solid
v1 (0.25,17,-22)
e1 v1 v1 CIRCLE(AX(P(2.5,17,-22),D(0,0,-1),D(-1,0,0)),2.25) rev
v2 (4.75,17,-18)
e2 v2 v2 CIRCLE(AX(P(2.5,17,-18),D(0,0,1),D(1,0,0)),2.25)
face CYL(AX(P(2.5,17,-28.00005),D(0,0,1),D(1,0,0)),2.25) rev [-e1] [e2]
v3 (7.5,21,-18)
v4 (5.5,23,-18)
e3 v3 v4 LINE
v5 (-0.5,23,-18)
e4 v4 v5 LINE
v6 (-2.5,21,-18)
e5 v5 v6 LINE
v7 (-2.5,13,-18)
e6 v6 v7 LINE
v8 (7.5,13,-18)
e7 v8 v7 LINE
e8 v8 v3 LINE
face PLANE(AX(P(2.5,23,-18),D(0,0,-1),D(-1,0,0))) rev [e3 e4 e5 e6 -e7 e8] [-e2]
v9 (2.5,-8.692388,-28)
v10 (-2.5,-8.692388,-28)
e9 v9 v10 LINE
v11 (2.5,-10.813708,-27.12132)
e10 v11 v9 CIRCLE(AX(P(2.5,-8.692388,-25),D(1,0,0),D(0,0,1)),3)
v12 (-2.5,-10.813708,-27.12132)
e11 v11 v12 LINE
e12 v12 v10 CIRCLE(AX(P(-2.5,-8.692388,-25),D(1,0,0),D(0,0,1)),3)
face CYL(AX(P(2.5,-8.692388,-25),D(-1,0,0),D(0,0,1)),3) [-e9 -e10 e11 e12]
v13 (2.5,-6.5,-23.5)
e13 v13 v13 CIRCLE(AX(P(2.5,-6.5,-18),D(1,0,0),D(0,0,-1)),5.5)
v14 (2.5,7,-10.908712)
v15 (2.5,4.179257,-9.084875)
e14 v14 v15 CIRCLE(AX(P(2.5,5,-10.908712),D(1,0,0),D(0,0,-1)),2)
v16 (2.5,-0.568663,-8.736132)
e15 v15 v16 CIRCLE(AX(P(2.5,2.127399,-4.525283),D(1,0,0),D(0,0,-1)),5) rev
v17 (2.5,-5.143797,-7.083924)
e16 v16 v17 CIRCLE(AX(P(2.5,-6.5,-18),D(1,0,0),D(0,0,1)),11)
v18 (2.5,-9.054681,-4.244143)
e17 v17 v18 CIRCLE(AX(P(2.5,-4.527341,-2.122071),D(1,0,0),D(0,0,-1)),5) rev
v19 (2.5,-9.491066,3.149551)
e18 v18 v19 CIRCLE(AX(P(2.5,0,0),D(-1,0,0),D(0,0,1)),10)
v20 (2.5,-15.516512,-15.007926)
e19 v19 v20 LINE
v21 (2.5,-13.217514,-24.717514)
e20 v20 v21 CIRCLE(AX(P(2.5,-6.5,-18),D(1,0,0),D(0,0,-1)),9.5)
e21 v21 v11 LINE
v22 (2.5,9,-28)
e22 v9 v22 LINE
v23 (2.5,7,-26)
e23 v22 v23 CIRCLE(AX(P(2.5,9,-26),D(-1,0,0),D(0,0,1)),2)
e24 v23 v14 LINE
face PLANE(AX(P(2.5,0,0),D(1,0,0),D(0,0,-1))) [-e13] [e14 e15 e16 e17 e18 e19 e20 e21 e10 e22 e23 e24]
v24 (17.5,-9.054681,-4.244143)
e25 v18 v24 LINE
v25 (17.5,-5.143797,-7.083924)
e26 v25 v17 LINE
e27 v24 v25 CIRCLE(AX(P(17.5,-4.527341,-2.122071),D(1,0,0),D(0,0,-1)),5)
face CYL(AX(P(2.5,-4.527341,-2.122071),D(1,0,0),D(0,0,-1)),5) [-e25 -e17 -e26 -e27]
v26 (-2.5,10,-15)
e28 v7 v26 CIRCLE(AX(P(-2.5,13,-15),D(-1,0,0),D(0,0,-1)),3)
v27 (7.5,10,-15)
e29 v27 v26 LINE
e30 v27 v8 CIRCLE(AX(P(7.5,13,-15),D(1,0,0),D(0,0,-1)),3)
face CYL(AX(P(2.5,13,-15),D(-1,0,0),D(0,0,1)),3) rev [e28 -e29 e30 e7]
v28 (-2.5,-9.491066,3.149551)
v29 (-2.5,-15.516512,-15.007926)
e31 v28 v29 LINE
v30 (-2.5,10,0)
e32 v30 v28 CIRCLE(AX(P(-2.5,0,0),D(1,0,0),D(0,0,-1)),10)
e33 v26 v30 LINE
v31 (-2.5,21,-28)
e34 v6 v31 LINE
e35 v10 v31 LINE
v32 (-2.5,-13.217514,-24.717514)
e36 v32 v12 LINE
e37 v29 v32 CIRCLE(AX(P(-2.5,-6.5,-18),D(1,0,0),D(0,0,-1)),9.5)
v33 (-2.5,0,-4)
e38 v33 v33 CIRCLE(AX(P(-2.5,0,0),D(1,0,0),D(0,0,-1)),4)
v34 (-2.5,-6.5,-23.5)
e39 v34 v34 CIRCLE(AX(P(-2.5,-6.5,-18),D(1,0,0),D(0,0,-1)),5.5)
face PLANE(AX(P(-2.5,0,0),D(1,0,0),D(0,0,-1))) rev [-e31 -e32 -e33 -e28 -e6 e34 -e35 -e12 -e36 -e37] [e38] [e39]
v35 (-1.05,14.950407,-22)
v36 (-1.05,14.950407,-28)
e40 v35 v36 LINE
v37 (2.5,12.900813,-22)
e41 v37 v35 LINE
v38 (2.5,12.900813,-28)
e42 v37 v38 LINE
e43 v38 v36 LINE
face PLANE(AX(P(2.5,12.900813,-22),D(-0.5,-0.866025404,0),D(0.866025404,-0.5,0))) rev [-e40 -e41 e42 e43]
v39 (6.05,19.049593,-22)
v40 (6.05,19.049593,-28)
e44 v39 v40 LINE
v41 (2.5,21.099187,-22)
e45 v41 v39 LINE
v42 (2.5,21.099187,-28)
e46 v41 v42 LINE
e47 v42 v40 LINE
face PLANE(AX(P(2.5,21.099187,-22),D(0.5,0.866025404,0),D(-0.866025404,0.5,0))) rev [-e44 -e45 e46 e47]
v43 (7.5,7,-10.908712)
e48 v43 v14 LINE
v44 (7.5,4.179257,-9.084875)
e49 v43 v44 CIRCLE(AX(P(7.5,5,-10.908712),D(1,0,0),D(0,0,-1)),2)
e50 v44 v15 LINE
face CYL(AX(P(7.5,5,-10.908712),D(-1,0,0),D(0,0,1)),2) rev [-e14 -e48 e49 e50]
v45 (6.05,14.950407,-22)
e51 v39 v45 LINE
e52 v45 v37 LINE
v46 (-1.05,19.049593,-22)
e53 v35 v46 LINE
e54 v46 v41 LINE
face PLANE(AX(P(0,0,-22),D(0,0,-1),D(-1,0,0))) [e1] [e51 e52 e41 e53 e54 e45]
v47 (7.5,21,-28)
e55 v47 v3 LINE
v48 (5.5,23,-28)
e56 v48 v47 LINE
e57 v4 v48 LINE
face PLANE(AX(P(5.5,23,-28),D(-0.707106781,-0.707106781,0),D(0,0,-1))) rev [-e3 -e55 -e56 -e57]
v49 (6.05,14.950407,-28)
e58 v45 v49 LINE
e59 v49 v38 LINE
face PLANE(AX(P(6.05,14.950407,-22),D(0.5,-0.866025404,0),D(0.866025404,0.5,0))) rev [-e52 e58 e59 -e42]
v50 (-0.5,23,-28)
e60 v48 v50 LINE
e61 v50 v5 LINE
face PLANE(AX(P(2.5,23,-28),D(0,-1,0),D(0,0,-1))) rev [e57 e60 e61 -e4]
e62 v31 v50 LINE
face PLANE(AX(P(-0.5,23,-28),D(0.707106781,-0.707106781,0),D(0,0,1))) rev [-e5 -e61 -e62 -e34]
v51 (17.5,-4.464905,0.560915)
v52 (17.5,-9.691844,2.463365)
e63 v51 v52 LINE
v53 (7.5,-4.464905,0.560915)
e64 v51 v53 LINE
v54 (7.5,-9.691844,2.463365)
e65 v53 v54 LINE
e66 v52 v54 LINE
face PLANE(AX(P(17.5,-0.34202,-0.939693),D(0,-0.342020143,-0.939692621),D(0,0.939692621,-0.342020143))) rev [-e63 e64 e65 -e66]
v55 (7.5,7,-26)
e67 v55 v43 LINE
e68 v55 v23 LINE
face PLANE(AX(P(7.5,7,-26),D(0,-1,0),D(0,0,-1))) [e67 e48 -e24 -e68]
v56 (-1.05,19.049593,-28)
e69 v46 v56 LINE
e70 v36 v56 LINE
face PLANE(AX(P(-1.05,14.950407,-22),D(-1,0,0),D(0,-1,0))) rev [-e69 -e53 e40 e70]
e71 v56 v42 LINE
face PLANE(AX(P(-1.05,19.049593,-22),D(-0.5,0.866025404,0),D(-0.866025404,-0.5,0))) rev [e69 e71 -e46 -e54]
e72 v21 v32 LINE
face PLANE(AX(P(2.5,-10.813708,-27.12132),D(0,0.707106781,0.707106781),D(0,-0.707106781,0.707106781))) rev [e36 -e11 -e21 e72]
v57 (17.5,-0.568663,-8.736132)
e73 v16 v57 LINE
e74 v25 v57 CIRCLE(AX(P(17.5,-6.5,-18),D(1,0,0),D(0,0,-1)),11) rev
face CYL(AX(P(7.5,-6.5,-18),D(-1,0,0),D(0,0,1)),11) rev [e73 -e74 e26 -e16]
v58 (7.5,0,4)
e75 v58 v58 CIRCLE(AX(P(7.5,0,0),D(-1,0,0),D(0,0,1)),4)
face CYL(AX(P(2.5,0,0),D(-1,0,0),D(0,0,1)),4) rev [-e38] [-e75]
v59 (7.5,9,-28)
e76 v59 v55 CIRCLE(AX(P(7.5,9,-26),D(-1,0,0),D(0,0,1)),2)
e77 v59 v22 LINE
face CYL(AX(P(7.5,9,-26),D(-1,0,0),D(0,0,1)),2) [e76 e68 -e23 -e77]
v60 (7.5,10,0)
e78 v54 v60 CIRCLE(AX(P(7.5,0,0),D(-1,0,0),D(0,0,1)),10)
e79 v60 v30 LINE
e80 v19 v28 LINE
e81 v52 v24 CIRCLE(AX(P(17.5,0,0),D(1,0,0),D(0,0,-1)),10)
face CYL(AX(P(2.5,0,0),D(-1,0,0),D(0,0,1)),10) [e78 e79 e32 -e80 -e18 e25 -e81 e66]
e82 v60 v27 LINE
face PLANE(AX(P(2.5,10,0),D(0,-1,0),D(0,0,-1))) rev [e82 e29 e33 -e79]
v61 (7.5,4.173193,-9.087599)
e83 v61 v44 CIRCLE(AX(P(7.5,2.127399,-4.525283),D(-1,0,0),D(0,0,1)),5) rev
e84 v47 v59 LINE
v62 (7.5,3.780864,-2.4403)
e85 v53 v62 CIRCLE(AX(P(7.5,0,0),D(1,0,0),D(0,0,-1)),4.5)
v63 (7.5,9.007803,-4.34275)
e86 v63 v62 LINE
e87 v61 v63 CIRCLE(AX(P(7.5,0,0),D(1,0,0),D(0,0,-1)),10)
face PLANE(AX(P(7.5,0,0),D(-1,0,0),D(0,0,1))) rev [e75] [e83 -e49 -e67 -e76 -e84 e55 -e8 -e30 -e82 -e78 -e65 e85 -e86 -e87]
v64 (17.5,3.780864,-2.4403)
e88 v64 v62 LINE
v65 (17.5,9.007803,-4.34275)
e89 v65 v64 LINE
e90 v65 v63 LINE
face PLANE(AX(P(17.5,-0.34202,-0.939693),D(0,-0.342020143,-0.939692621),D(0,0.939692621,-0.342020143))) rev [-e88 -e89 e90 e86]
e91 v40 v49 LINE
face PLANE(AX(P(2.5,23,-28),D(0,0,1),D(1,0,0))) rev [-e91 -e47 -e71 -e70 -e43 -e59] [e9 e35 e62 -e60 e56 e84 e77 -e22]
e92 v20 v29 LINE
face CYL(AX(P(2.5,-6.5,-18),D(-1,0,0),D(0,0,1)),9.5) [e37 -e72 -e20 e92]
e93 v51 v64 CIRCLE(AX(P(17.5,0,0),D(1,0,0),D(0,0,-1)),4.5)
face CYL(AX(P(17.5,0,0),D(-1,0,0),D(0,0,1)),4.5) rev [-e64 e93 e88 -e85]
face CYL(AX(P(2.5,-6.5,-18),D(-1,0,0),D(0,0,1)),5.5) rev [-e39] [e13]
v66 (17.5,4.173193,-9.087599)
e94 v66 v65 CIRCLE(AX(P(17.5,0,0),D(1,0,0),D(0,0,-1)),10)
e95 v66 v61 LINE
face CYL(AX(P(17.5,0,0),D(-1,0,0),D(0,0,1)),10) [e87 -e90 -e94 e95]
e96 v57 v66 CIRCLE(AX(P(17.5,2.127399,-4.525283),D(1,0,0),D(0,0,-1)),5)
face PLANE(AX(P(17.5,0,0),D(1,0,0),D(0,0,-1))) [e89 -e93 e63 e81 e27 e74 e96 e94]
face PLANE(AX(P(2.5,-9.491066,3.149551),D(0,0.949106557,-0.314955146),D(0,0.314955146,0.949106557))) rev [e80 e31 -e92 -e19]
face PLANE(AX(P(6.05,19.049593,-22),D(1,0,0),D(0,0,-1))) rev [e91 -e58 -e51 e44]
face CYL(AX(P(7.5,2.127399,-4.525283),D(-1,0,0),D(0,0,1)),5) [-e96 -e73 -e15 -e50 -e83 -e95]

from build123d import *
from build123d.topology import SkipClean

# Parameters (mm, degrees)
SKETCH1_R           = 4
SKETCH1_R_2         = 5.5
BOSS_EXTRUDE1_DEPTH = 2.5
BOSS_EXTRUDE2_START = -5
SKETCH2_R           = 4
BOSS_EXTRUDE2_DEPTH = 5
SKETCH3_R           = 2.25
CUT_EXTRUDE1_DEPTH  = 38.003378224
CUT_EXTRUDE2_DEPTH  = 6
CHAMFER1_SIZE       = 2
FILLET1_R           = 5
BOSS_EXTRUDE3_DEPTH = 10


# Read off the part's stored shape, not the designer's step: Boss-Extrude3
with BuildPart() as part:
    # Sketch1 → Boss-Extrude1 (new, symmetric)
    with BuildSketch(Plane(origin=(0, 0, 0), x_dir=(0, 0, -1), z_dir=(1, 0, 0))):
        with BuildLine():
            Line((-3.149551455, -9.491065569), (15.007926117, -15.51651229))
            ThreePointArc((15.007926117, -15.51651229), (20.188852348, -15.744399678), (24.717514421, -13.217514421))
            Line((24.717514421, -13.217514421), (27.121320344, -10.813708499))
            ThreePointArc((27.121320344, -10.813708499), (27.771638598, -9.840438453), (28, -8.692388155))
            Line((28, -8.692388155), (28, 23))
            Line((28, 23), (18, 23))
            Line((18, 23), (18, 13))
            ThreePointArc((18, 13), (17.121320344, 10.878679656), (15, 10))
            Line((15, 10), (0, 10))
            ThreePointArc((0, 10), (-9.871946507, 1.595202857), (-3.149551455, -9.491065569))
        make_face()
        Circle(SKETCH1_R, mode=Mode.SUBTRACT)
        with Locations((18, -6.5)):
            Circle(SKETCH1_R_2, mode=Mode.SUBTRACT)
    extrude(amount=BOSS_EXTRUDE1_DEPTH, both=True)

    # Sketch2 → Boss-Extrude2 (add)
    with SkipClean():  # the faces are left unmerged after this step: merging them gives an invalid solid
        with BuildSketch(Plane.ZY.offset(-2.5).offset(BOSS_EXTRUDE2_START)):
            with BuildLine():
                Line((0, 10), (-15, 10))
                ThreePointArc((-15, 10), (-17.121320344, 10.878679656), (-18, 13))
                Line((-18, 13), (-18, 23))
                Line((-18, 23), (-28, 23))
                Line((-28, 23), (-28, 9))
                ThreePointArc((-28, 9), (-27.414213562, 7.585786438), (-26, 7))
                Line((-26, 7), (-10.908712115, 7))
                ThreePointArc((-10.908712115, 7), (-9.225461292, 6.08012345), (-9.090593429, 4.166666667))
                ThreePointArc((-9.090593429, 4.166666667), (-9.651431629, 2.617225154), (-9.950203687, 0.996717904))
                ThreePointArc((-9.950203687, 0.996717904), (-7.653907103, -2.763910898), (-7.017714401, -7.124021658))
                ThreePointArc((-7.017714401, -7.124021658), (9.253113438, -3.792082767), (0, 10))
            make_face()
            Circle(SKETCH2_R, mode=Mode.SUBTRACT)
        extrude(amount=BOSS_EXTRUDE2_DEPTH)

    # Sketch3 → Cut-Extrude1 (cut, through all)
    with SkipClean():  # the faces are left unmerged after this step: merging them gives an invalid solid
        with BuildSketch(Plane.XY.offset(-18)):
            with Locations((2.5, 17)):
                Circle(SKETCH3_R)
        extrude(amount=-CUT_EXTRUDE1_DEPTH, mode=Mode.SUBTRACT)

    # Sketch4 → Cut-Extrude2 (cut)
    with SkipClean():  # the faces are left unmerged after this step: merging them gives an invalid solid
        with BuildSketch(Plane(origin=(0, 0, -28), x_dir=(-1, 0, 0), z_dir=(0, 0, -1))):
            Polygon((-6.05, 14.950406544), (-2.5, 12.900813089), (1.05, 14.950406544), (1.05, 19.049593456), (-2.5, 21.099186911), (-6.05, 19.049593456), align=None)
        extrude(amount=-CUT_EXTRUDE2_DEPTH, mode=Mode.SUBTRACT)

    # Chamfer1
    chamfer1_edges = [part.edges().sort_by_distance(p)[0] for p in [
        (-2.5, 23, -23),
        (7.5, 23, -23),
    ]]
    chamfer(chamfer1_edges, length=CHAMFER1_SIZE)

    # Fillet1
    fillet1_edges = [part.edges().sort_by_distance(p)[0] for p in [
        (5, -7.124021658, -7.017714401),
        (5, 0.996717904, -9.950203687),
    ]]
    fillet(fillet1_edges, radius=FILLET1_R)

    # Boss-Extrude3 outline → Boss-Extrude3 (add)
    with SkipClean():  # the faces are left unmerged after this step: merging them gives an invalid solid
        with BuildSketch(Plane(origin=(7.5, 0, 0), x_dir=(0, 0, -1), z_dir=(1, 0, 0))):
            with BuildLine():
                ThreePointArc((-2.463364838, -9.691843668), (0.945667306, -9.955185249), (4.244142914, -9.054681161))
                ThreePointArc((4.244142914, -9.054681161), (6.167964396, -7.465154449), (7.083924127, -5.143796649))
                ThreePointArc((7.083924127, -5.143796649), (7.6539625, -2.763757496), (8.736132305, -0.568663276))
                ThreePointArc((8.736132305, -0.568663276), (9.511605201, 1.757812047), (9.087599302, 4.173192895))
                ThreePointArc((9.087599302, 4.173192895), (7.137011683, 7.00450314), (4.342750079, 9.007803381))
                Line((4.342750079, 9.007803381), (2.44029991, 3.780864498))
                ThreePointArc((2.44029991, 3.780864498), (4.228616794, -1.539090645), (-0.560914668, -4.464904785))
                Line((-0.560914668, -4.464904785), (-2.463364838, -9.691843668))
            make_face()
        extrude(amount=BOSS_EXTRUDE3_DEPTH)


solid = part.part
